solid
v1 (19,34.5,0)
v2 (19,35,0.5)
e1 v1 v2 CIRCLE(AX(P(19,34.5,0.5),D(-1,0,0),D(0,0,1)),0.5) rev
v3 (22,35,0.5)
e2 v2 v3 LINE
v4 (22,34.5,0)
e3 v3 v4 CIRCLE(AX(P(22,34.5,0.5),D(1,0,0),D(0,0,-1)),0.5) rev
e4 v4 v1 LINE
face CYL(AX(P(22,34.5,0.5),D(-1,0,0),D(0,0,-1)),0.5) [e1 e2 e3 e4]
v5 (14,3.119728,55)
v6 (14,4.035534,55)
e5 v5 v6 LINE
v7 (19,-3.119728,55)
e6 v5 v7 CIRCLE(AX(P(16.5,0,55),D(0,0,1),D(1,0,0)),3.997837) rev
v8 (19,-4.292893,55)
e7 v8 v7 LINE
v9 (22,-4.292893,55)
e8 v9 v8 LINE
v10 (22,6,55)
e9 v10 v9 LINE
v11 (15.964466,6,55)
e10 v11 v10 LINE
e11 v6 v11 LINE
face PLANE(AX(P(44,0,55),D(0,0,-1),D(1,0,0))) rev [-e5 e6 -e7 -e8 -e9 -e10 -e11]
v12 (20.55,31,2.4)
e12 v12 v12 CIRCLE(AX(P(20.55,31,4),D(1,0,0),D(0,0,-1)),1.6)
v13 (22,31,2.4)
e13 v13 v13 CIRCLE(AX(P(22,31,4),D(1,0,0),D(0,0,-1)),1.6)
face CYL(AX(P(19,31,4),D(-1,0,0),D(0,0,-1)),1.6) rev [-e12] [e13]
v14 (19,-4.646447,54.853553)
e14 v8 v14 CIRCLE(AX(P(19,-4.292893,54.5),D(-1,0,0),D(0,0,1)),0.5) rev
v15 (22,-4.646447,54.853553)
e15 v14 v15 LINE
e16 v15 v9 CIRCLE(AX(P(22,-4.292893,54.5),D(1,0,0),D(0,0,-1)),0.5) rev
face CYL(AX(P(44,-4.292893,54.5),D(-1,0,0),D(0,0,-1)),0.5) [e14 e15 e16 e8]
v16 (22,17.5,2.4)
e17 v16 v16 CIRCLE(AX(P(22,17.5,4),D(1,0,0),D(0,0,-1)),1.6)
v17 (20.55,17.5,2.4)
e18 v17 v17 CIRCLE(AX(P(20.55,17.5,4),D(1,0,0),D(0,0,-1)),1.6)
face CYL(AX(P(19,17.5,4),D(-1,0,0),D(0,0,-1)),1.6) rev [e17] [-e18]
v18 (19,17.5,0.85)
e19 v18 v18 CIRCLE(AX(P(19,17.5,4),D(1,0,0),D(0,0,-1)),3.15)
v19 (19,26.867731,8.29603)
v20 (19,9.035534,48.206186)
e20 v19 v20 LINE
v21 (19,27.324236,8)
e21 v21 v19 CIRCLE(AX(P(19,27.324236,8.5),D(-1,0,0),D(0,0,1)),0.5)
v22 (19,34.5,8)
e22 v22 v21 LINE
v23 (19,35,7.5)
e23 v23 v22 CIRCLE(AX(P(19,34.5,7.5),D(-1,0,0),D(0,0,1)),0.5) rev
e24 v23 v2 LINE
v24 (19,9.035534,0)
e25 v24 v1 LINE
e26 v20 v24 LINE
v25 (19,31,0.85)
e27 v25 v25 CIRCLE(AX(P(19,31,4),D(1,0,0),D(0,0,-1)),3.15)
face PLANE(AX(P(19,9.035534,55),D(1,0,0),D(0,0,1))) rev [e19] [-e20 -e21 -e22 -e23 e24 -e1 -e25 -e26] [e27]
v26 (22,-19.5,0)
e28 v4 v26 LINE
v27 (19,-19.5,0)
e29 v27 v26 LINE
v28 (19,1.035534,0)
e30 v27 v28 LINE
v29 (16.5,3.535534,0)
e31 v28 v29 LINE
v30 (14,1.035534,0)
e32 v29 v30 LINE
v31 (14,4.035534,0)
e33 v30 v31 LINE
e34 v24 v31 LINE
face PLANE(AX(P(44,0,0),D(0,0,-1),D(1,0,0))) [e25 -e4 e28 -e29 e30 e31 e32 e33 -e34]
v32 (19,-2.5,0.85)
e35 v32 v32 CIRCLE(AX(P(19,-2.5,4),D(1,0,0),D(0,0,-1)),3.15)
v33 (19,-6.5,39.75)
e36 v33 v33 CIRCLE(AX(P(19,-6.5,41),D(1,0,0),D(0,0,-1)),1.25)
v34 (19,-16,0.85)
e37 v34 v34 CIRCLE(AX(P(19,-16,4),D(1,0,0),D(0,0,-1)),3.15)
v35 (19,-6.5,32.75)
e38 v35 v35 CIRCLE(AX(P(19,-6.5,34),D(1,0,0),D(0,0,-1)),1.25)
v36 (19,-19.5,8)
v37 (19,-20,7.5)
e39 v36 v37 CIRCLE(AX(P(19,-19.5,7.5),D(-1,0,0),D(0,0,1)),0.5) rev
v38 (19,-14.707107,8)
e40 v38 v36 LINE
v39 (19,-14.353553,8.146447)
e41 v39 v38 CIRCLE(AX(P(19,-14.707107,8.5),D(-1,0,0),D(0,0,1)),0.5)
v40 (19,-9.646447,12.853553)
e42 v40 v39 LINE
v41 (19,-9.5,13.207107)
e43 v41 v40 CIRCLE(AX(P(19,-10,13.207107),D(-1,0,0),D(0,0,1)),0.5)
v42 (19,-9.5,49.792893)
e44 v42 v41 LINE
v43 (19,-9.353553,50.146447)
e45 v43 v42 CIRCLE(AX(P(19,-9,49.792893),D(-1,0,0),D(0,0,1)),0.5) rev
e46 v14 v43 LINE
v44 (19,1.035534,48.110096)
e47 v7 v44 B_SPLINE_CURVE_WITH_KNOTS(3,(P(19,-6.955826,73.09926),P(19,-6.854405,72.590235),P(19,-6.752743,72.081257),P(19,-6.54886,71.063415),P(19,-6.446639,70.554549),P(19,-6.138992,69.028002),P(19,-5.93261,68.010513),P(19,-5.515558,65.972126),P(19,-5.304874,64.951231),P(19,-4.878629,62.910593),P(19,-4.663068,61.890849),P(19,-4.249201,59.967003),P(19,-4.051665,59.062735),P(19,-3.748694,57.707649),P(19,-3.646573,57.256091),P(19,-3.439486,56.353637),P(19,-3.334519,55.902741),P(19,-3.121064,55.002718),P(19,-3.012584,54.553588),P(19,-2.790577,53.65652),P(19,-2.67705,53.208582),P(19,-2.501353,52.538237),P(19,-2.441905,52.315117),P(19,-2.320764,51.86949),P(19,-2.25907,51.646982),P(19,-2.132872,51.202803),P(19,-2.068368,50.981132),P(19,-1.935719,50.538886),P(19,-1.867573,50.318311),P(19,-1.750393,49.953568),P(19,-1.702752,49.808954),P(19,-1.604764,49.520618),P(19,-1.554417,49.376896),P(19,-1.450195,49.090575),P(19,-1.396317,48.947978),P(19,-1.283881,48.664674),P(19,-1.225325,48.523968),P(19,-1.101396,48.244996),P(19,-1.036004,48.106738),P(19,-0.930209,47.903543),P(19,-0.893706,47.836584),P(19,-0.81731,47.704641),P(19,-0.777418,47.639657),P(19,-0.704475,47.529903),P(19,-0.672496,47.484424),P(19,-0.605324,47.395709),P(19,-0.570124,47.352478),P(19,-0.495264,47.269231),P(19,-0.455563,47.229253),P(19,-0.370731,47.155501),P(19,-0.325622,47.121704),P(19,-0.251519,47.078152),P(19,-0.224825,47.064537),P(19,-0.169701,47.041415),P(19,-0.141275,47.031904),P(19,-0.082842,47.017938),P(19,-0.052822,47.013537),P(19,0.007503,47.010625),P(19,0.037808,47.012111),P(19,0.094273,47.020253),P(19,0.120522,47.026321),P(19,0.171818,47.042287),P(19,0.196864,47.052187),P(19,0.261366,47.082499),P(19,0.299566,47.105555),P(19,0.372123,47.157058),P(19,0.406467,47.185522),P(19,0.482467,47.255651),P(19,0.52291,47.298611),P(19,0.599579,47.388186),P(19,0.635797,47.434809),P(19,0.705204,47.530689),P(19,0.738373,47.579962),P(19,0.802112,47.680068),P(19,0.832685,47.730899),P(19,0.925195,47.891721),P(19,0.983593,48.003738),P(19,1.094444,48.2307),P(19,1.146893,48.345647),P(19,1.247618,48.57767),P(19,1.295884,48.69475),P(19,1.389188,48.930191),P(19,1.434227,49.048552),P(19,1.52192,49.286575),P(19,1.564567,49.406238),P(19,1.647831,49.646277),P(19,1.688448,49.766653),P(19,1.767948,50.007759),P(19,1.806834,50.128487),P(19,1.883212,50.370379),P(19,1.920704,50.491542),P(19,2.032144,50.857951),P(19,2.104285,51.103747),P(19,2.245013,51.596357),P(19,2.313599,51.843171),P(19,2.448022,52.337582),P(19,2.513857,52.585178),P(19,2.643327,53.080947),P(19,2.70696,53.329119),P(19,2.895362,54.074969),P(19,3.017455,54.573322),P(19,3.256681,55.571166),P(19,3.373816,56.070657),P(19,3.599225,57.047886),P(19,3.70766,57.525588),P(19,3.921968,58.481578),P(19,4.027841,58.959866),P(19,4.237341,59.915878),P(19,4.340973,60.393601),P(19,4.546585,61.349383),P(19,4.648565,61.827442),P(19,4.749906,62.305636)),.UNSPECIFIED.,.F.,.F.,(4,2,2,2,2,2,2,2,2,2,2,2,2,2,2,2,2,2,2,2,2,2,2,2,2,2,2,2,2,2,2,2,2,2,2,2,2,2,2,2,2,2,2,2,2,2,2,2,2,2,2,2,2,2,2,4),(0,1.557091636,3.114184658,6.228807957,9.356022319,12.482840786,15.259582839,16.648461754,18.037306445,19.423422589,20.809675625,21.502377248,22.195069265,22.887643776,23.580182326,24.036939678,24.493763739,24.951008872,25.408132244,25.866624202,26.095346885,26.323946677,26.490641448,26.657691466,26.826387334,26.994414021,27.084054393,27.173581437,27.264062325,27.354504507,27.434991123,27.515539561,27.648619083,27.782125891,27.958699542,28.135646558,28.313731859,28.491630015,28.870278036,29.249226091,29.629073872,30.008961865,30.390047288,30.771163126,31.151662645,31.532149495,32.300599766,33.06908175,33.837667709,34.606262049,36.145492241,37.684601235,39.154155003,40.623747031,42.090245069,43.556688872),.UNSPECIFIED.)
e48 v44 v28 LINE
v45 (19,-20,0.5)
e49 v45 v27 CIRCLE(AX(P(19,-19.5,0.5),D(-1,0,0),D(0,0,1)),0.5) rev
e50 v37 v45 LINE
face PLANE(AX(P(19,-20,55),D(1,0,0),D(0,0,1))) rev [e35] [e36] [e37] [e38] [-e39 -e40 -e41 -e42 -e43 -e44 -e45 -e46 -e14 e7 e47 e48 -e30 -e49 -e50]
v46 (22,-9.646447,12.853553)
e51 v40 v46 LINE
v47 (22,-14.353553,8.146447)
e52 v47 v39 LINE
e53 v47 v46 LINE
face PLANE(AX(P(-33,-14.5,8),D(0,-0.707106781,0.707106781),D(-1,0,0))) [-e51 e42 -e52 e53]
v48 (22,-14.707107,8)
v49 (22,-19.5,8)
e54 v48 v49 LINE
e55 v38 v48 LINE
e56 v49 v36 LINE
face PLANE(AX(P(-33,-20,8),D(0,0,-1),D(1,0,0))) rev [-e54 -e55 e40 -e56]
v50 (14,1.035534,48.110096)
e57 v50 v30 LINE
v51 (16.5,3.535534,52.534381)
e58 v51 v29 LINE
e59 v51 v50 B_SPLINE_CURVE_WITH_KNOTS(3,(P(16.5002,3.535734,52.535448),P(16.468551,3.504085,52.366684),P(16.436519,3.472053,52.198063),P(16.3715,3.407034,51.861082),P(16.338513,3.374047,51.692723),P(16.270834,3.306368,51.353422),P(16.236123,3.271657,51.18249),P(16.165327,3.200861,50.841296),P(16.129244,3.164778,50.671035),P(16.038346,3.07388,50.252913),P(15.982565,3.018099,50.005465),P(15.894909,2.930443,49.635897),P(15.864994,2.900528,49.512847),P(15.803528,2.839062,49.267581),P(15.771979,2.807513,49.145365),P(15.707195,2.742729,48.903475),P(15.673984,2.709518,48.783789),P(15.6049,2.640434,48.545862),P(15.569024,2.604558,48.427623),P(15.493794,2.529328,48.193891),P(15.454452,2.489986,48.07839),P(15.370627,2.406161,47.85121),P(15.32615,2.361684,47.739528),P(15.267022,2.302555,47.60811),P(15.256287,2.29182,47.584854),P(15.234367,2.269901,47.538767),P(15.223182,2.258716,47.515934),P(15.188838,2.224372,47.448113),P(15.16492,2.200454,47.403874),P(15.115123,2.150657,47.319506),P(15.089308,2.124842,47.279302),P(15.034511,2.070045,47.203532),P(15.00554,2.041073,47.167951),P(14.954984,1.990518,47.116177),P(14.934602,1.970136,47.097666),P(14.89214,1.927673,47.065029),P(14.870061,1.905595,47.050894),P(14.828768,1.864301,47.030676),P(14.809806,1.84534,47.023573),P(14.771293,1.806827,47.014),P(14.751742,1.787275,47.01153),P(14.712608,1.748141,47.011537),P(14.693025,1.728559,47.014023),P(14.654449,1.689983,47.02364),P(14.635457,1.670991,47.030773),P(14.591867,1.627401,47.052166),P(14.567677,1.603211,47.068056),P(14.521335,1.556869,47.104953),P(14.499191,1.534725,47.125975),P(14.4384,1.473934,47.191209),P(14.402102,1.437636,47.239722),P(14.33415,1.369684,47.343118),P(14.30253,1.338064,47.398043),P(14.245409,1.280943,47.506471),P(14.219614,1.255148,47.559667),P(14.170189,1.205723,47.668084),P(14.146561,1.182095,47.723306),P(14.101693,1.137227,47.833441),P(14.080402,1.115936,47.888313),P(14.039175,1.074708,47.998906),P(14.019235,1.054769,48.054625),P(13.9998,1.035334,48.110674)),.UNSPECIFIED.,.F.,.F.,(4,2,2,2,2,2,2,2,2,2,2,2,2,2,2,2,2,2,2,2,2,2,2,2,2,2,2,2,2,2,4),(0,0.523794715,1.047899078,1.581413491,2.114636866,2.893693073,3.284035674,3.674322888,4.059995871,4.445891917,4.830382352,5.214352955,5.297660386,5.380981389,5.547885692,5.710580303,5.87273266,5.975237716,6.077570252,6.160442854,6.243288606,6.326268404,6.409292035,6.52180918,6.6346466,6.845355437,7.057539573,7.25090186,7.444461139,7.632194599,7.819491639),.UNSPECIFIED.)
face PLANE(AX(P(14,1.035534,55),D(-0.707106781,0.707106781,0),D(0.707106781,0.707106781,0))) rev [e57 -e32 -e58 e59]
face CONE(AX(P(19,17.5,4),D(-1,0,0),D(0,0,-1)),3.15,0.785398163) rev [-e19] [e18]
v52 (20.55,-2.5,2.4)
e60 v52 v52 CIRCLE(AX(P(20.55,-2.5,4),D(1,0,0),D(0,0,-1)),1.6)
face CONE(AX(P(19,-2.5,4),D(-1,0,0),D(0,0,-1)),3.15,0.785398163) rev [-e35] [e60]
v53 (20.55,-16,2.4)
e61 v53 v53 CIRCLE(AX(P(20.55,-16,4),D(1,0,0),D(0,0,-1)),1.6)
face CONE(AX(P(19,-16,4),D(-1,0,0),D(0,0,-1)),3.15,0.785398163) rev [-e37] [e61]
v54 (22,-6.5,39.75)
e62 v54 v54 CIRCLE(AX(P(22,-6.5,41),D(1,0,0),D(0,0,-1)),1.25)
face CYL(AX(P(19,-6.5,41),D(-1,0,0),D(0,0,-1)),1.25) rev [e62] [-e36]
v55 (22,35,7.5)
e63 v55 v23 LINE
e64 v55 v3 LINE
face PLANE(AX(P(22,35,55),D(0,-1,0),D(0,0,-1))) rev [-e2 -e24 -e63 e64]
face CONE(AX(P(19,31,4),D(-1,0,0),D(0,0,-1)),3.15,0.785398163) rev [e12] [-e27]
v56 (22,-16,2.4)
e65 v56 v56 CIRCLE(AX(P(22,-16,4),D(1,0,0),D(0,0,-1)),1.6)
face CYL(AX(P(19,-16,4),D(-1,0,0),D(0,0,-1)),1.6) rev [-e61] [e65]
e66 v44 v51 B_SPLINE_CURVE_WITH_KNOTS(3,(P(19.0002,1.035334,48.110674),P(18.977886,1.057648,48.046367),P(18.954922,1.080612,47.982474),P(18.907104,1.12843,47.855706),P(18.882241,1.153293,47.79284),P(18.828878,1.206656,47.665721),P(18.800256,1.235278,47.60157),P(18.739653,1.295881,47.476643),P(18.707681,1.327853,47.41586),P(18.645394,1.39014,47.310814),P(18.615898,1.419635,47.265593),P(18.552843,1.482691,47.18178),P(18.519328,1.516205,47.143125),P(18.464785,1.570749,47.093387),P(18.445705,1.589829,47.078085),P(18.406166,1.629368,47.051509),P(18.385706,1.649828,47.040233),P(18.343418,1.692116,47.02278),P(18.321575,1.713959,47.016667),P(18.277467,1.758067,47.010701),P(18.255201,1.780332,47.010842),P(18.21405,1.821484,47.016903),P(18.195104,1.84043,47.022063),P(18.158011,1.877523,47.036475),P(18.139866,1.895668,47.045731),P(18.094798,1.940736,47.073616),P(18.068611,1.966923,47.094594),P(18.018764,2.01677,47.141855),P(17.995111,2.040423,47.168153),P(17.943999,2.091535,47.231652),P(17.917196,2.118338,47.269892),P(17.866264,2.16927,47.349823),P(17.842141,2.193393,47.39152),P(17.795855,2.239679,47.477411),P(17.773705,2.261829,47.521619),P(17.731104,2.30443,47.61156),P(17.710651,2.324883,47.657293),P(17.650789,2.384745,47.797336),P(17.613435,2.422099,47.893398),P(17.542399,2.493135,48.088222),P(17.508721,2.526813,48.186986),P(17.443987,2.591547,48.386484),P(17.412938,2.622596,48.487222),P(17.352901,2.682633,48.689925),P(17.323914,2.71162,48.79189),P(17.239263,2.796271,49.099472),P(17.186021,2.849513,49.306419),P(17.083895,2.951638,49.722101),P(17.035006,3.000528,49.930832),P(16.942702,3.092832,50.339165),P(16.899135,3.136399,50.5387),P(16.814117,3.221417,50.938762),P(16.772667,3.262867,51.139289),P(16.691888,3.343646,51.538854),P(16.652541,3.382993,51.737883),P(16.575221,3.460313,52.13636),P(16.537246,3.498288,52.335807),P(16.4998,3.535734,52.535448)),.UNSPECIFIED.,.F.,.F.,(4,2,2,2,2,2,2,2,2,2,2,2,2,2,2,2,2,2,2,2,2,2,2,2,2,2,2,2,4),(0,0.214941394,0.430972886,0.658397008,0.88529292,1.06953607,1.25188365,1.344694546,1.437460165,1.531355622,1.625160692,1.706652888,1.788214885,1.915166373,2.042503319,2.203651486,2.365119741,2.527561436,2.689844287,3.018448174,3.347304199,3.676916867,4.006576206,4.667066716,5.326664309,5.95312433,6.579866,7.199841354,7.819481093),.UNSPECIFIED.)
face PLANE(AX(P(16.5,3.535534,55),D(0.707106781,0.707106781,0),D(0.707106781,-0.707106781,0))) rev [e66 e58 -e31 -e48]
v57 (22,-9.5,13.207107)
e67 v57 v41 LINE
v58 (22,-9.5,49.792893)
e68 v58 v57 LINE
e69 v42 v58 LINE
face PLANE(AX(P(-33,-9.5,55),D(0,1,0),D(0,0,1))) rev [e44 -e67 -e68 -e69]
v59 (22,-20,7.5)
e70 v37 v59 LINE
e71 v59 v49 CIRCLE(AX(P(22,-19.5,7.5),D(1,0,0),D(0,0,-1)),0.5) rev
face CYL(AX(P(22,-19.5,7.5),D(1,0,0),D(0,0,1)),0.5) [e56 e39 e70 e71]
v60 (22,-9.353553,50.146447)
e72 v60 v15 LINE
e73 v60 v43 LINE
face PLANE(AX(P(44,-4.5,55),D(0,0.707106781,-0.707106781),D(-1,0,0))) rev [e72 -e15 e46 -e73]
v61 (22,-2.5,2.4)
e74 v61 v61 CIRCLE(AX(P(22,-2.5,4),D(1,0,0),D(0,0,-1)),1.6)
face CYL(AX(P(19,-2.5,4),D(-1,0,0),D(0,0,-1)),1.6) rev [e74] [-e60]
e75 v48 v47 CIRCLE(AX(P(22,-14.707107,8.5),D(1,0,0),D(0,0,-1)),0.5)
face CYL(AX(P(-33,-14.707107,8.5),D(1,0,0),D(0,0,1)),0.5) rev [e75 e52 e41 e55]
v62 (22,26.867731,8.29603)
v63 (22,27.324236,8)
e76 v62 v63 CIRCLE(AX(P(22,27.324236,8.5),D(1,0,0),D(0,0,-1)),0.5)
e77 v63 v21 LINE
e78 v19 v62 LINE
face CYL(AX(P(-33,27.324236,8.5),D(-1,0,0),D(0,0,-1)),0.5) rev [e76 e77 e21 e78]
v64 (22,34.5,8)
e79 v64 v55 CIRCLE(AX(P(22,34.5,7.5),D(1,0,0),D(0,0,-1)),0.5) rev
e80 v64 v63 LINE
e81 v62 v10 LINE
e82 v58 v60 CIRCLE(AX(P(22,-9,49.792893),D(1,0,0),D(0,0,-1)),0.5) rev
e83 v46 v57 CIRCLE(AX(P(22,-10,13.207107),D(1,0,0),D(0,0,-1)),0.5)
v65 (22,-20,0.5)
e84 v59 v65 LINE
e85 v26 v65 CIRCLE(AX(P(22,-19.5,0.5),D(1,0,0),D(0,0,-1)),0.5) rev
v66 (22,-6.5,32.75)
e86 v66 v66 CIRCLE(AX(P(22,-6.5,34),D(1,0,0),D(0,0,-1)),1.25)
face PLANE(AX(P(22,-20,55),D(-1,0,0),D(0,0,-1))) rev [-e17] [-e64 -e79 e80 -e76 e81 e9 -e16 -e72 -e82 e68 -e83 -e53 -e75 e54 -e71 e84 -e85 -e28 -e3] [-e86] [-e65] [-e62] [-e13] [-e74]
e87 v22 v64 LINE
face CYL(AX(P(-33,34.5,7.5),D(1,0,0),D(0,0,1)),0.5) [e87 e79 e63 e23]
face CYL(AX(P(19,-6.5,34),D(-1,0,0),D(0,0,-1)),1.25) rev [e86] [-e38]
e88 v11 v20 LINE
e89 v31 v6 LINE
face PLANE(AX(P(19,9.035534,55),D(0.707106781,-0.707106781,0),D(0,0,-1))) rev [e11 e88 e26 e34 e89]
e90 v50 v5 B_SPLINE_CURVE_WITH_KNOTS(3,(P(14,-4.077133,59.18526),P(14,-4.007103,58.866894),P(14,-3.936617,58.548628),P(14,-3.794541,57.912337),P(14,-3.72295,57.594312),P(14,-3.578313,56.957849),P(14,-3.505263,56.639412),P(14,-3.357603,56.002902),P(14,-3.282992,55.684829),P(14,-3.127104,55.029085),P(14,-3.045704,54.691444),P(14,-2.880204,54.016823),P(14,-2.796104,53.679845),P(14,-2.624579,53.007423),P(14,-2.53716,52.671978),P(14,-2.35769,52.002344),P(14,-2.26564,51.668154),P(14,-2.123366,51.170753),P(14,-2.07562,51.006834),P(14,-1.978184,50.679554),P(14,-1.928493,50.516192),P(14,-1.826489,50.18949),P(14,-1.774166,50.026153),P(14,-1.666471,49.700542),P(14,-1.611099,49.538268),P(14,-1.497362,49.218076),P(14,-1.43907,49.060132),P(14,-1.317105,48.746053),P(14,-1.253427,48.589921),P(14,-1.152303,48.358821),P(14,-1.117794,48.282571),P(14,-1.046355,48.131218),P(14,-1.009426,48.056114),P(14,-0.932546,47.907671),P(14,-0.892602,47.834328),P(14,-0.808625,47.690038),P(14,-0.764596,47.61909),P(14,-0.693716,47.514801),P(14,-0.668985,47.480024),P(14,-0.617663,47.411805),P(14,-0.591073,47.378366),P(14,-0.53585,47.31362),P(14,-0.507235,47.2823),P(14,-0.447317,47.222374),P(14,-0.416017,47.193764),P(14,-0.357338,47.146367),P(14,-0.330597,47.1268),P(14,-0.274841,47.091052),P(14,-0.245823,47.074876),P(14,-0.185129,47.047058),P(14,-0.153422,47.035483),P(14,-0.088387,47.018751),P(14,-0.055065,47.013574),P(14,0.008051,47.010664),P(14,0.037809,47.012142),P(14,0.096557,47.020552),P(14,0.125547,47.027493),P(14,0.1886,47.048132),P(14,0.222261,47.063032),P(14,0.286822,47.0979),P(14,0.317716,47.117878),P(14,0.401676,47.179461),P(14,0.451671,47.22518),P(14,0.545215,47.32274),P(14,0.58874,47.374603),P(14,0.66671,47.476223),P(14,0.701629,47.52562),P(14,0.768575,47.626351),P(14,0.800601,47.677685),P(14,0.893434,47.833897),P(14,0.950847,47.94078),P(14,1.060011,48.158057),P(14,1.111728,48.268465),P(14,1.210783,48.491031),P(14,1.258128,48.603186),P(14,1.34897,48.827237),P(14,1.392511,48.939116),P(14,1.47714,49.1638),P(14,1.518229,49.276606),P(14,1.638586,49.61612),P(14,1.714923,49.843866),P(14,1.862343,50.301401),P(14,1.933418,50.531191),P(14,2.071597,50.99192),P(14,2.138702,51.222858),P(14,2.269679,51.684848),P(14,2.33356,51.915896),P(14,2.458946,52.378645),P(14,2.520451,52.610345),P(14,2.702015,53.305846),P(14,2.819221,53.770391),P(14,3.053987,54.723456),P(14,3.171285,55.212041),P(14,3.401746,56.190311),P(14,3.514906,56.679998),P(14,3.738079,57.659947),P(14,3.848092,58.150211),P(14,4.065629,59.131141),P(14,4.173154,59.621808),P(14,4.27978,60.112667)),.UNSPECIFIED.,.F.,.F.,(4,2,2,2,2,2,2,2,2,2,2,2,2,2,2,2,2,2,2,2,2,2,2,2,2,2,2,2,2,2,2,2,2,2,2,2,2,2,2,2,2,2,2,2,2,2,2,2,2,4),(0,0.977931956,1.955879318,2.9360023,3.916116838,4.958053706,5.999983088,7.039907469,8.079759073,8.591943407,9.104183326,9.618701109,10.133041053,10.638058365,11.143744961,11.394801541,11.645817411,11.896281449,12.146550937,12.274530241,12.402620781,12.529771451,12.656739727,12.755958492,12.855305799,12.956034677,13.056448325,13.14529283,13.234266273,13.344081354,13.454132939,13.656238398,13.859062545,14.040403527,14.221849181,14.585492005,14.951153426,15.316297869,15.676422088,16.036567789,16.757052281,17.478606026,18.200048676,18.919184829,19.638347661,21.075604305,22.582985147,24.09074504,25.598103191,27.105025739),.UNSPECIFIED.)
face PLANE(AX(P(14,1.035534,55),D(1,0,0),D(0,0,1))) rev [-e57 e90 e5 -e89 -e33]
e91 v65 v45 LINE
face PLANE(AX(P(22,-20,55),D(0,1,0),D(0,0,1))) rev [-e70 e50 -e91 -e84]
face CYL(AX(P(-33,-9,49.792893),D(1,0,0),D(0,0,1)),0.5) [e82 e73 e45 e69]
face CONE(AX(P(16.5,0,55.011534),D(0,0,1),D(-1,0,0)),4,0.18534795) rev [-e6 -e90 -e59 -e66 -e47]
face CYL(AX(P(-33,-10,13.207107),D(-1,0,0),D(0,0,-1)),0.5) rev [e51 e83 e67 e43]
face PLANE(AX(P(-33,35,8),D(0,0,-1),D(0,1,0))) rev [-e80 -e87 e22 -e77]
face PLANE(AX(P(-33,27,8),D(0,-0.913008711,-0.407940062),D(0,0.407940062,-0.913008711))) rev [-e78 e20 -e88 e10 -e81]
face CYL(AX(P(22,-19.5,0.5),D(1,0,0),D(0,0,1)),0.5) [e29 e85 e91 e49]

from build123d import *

# Parameters (mm, degrees)
BOSS_EXTRUDE1_DEPTH                            = 55
SKETCH6_W                                      = 47
SKETCH6_H                                      = 10.5
CUT_EXTRUDE3_DEPTH                             = 55
CHAMFER3_SIZE                                  = 5
CHAMFER4_SIZE                                  = 5
CSK_FOR_M3_FLAT_HEAD_MACHINE_SCREW1_AT_2_COUNT = 2
CSK_FOR_M3_FLAT_HEAD_MACHINE_SCREW1_AT_2_PITCH = 13.5
CSK_FOR_M3_FLAT_HEAD_MACHINE_SCREW1_AT_3_COUNT = 2
CSK_FOR_M3_FLAT_HEAD_MACHINE_SCREW1_AT_3_PITCH = 47
CSK_FOR_M3_FLAT_HEAD_MACHINE_SCREW1_AT_4_COUNT = 2
CSK_FOR_M3_FLAT_HEAD_MACHINE_SCREW1_AT_4_PITCH = 33.5
TAP_DRILL_FOR_M3X0_5_TAP1_D                    = 2.5
FILLET1_R                                      = 0.5


# Read off the part's stored shape, not the designer's step: Body-Delete/Keep 1
with BuildPart() as part:
    # Sketch1 → Boss-Extrude1 (new body)
    with BuildSketch(Plane.XY):
        Polygon((22, -20), (25, -20), (25, 1.035533906), (27.5, 3.535533906), (30, 1.035533906), (30, 9.035533906), (25, 9.035533906), (25, 35), (22, 35), align=None)
    extrude(amount=BOSS_EXTRUDE1_DEPTH)

    # Sketch4 → Cut-Revolve1 (revolve, cut)
    with BuildSketch(Plane(origin=(0, 0, 0), x_dir=(1, 0, 0), z_dir=(0, 1, 0))):
        Polygon((27.5, -47.011533546), (30, -47.011533546), (31.5, -55.011533546), (27.5, -55.011533546), align=None)
    revolve(axis=Axis((27.5, 0, 0), (0, 0, 1)), mode=Mode.SUBTRACT)

    # Sketch6 → Cut-Extrude3 (cut)
    with BuildSketch(Plane.ZY.offset(-22)):
        Polygon((55, 6), (55, 35), (8, 35), (8, 27), align=None)
        with Locations((31.5, -14.75)):
            Rectangle(SKETCH6_W, SKETCH6_H)
    extrude(amount=-CUT_EXTRUDE3_DEPTH, mode=Mode.SUBTRACT)

    # Chamfer3
    chamfer3_edges = [part.edges().sort_by_distance(p)[0] for p in [
        (23.5, -9.5, 55),
        (23.5, -9.5, 8),
    ]]
    chamfer(chamfer3_edges, length=CHAMFER3_SIZE)

    # Chamfer4
    chamfer4_edges = [part.edges().sort_by_distance(p)[0] for p in [
        (30, 9.035533906, 24.10309301),
    ]]
    chamfer(chamfer4_edges, length=CHAMFER4_SIZE - 0.0001)  # a hair under: the kernel refuses the full size

    # Sketch8 → CSK for M3 Flat Head Machine Screw1 (revolve, cut)
    with BuildSketch(Plane(origin=(25, 31, 4), x_dir=(0, 0, -1), z_dir=(0, 1, 0))):
        Polygon((0, 0), (0, 3), (1.6, 3), (1.6, 1.55), (3.15, 0), align=None)
    csk_for_m3_flat_head_machine_screw1 = revolve(axis=Axis((31.35, 31, 4), (-1, 0, 0)), mode=Mode.SUBTRACT)

    # CSK for M3 Flat Head Machine Screw1 at 2: CSK for M3 Flat Head Machine Screw1 ×2
    with Locations(*[(0, -i * CSK_FOR_M3_FLAT_HEAD_MACHINE_SCREW1_AT_2_PITCH, 0) for i in range(1, CSK_FOR_M3_FLAT_HEAD_MACHINE_SCREW1_AT_2_COUNT)]):
        add(csk_for_m3_flat_head_machine_screw1, mode=Mode.SUBTRACT)

    # CSK for M3 Flat Head Machine Screw1 at 3: CSK for M3 Flat Head Machine Screw1 ×2
    with Locations(*[(0, -i * CSK_FOR_M3_FLAT_HEAD_MACHINE_SCREW1_AT_3_PITCH, 0) for i in range(1, CSK_FOR_M3_FLAT_HEAD_MACHINE_SCREW1_AT_3_COUNT)]):
        add(csk_for_m3_flat_head_machine_screw1, mode=Mode.SUBTRACT)

    # CSK for M3 Flat Head Machine Screw1 at 4: CSK for M3 Flat Head Machine Screw1 ×2
    with Locations(*[(0, -i * CSK_FOR_M3_FLAT_HEAD_MACHINE_SCREW1_AT_4_PITCH, 0) for i in range(1, CSK_FOR_M3_FLAT_HEAD_MACHINE_SCREW1_AT_4_COUNT)]):
        add(csk_for_m3_flat_head_machine_screw1, mode=Mode.SUBTRACT)

    # Tap Drill for M3x0.5 Tap1 (through all)
    with Locations(Plane(origin=(25, 0, 0), x_dir=(0, 0, -1), z_dir=(1, 0, 0))):
        with Locations((-41, -6.5), (-34, -6.5)):
            Hole(TAP_DRILL_FOR_M3X0_5_TAP1_D / 2)

    # Fillet1
    fillet1_edges = [part.edges().sort_by_distance(p)[0] for p in [
        (23.5, -20, 0),
        (23.5, 27, 8),
        (23.5, 35, 8),
        (23.5, -20, 8),
        (23.5, -14.5, 8),
        (23.5, -9.5, 50),
        (23.5, -9.5, 13),
        (23.5, -4.5, 55),
        (23.5, 35, 0),
    ]]
    fillet(fillet1_edges, radius=FILLET1_R)


with BuildPart() as body_2:
    # Mirror2: mirrored copy
    add(part.part.mirror(Plane(origin=(22, -20, 55), x_dir=(0, 0, 1), z_dir=(1, 0, 0))))


solid = body_2.part
